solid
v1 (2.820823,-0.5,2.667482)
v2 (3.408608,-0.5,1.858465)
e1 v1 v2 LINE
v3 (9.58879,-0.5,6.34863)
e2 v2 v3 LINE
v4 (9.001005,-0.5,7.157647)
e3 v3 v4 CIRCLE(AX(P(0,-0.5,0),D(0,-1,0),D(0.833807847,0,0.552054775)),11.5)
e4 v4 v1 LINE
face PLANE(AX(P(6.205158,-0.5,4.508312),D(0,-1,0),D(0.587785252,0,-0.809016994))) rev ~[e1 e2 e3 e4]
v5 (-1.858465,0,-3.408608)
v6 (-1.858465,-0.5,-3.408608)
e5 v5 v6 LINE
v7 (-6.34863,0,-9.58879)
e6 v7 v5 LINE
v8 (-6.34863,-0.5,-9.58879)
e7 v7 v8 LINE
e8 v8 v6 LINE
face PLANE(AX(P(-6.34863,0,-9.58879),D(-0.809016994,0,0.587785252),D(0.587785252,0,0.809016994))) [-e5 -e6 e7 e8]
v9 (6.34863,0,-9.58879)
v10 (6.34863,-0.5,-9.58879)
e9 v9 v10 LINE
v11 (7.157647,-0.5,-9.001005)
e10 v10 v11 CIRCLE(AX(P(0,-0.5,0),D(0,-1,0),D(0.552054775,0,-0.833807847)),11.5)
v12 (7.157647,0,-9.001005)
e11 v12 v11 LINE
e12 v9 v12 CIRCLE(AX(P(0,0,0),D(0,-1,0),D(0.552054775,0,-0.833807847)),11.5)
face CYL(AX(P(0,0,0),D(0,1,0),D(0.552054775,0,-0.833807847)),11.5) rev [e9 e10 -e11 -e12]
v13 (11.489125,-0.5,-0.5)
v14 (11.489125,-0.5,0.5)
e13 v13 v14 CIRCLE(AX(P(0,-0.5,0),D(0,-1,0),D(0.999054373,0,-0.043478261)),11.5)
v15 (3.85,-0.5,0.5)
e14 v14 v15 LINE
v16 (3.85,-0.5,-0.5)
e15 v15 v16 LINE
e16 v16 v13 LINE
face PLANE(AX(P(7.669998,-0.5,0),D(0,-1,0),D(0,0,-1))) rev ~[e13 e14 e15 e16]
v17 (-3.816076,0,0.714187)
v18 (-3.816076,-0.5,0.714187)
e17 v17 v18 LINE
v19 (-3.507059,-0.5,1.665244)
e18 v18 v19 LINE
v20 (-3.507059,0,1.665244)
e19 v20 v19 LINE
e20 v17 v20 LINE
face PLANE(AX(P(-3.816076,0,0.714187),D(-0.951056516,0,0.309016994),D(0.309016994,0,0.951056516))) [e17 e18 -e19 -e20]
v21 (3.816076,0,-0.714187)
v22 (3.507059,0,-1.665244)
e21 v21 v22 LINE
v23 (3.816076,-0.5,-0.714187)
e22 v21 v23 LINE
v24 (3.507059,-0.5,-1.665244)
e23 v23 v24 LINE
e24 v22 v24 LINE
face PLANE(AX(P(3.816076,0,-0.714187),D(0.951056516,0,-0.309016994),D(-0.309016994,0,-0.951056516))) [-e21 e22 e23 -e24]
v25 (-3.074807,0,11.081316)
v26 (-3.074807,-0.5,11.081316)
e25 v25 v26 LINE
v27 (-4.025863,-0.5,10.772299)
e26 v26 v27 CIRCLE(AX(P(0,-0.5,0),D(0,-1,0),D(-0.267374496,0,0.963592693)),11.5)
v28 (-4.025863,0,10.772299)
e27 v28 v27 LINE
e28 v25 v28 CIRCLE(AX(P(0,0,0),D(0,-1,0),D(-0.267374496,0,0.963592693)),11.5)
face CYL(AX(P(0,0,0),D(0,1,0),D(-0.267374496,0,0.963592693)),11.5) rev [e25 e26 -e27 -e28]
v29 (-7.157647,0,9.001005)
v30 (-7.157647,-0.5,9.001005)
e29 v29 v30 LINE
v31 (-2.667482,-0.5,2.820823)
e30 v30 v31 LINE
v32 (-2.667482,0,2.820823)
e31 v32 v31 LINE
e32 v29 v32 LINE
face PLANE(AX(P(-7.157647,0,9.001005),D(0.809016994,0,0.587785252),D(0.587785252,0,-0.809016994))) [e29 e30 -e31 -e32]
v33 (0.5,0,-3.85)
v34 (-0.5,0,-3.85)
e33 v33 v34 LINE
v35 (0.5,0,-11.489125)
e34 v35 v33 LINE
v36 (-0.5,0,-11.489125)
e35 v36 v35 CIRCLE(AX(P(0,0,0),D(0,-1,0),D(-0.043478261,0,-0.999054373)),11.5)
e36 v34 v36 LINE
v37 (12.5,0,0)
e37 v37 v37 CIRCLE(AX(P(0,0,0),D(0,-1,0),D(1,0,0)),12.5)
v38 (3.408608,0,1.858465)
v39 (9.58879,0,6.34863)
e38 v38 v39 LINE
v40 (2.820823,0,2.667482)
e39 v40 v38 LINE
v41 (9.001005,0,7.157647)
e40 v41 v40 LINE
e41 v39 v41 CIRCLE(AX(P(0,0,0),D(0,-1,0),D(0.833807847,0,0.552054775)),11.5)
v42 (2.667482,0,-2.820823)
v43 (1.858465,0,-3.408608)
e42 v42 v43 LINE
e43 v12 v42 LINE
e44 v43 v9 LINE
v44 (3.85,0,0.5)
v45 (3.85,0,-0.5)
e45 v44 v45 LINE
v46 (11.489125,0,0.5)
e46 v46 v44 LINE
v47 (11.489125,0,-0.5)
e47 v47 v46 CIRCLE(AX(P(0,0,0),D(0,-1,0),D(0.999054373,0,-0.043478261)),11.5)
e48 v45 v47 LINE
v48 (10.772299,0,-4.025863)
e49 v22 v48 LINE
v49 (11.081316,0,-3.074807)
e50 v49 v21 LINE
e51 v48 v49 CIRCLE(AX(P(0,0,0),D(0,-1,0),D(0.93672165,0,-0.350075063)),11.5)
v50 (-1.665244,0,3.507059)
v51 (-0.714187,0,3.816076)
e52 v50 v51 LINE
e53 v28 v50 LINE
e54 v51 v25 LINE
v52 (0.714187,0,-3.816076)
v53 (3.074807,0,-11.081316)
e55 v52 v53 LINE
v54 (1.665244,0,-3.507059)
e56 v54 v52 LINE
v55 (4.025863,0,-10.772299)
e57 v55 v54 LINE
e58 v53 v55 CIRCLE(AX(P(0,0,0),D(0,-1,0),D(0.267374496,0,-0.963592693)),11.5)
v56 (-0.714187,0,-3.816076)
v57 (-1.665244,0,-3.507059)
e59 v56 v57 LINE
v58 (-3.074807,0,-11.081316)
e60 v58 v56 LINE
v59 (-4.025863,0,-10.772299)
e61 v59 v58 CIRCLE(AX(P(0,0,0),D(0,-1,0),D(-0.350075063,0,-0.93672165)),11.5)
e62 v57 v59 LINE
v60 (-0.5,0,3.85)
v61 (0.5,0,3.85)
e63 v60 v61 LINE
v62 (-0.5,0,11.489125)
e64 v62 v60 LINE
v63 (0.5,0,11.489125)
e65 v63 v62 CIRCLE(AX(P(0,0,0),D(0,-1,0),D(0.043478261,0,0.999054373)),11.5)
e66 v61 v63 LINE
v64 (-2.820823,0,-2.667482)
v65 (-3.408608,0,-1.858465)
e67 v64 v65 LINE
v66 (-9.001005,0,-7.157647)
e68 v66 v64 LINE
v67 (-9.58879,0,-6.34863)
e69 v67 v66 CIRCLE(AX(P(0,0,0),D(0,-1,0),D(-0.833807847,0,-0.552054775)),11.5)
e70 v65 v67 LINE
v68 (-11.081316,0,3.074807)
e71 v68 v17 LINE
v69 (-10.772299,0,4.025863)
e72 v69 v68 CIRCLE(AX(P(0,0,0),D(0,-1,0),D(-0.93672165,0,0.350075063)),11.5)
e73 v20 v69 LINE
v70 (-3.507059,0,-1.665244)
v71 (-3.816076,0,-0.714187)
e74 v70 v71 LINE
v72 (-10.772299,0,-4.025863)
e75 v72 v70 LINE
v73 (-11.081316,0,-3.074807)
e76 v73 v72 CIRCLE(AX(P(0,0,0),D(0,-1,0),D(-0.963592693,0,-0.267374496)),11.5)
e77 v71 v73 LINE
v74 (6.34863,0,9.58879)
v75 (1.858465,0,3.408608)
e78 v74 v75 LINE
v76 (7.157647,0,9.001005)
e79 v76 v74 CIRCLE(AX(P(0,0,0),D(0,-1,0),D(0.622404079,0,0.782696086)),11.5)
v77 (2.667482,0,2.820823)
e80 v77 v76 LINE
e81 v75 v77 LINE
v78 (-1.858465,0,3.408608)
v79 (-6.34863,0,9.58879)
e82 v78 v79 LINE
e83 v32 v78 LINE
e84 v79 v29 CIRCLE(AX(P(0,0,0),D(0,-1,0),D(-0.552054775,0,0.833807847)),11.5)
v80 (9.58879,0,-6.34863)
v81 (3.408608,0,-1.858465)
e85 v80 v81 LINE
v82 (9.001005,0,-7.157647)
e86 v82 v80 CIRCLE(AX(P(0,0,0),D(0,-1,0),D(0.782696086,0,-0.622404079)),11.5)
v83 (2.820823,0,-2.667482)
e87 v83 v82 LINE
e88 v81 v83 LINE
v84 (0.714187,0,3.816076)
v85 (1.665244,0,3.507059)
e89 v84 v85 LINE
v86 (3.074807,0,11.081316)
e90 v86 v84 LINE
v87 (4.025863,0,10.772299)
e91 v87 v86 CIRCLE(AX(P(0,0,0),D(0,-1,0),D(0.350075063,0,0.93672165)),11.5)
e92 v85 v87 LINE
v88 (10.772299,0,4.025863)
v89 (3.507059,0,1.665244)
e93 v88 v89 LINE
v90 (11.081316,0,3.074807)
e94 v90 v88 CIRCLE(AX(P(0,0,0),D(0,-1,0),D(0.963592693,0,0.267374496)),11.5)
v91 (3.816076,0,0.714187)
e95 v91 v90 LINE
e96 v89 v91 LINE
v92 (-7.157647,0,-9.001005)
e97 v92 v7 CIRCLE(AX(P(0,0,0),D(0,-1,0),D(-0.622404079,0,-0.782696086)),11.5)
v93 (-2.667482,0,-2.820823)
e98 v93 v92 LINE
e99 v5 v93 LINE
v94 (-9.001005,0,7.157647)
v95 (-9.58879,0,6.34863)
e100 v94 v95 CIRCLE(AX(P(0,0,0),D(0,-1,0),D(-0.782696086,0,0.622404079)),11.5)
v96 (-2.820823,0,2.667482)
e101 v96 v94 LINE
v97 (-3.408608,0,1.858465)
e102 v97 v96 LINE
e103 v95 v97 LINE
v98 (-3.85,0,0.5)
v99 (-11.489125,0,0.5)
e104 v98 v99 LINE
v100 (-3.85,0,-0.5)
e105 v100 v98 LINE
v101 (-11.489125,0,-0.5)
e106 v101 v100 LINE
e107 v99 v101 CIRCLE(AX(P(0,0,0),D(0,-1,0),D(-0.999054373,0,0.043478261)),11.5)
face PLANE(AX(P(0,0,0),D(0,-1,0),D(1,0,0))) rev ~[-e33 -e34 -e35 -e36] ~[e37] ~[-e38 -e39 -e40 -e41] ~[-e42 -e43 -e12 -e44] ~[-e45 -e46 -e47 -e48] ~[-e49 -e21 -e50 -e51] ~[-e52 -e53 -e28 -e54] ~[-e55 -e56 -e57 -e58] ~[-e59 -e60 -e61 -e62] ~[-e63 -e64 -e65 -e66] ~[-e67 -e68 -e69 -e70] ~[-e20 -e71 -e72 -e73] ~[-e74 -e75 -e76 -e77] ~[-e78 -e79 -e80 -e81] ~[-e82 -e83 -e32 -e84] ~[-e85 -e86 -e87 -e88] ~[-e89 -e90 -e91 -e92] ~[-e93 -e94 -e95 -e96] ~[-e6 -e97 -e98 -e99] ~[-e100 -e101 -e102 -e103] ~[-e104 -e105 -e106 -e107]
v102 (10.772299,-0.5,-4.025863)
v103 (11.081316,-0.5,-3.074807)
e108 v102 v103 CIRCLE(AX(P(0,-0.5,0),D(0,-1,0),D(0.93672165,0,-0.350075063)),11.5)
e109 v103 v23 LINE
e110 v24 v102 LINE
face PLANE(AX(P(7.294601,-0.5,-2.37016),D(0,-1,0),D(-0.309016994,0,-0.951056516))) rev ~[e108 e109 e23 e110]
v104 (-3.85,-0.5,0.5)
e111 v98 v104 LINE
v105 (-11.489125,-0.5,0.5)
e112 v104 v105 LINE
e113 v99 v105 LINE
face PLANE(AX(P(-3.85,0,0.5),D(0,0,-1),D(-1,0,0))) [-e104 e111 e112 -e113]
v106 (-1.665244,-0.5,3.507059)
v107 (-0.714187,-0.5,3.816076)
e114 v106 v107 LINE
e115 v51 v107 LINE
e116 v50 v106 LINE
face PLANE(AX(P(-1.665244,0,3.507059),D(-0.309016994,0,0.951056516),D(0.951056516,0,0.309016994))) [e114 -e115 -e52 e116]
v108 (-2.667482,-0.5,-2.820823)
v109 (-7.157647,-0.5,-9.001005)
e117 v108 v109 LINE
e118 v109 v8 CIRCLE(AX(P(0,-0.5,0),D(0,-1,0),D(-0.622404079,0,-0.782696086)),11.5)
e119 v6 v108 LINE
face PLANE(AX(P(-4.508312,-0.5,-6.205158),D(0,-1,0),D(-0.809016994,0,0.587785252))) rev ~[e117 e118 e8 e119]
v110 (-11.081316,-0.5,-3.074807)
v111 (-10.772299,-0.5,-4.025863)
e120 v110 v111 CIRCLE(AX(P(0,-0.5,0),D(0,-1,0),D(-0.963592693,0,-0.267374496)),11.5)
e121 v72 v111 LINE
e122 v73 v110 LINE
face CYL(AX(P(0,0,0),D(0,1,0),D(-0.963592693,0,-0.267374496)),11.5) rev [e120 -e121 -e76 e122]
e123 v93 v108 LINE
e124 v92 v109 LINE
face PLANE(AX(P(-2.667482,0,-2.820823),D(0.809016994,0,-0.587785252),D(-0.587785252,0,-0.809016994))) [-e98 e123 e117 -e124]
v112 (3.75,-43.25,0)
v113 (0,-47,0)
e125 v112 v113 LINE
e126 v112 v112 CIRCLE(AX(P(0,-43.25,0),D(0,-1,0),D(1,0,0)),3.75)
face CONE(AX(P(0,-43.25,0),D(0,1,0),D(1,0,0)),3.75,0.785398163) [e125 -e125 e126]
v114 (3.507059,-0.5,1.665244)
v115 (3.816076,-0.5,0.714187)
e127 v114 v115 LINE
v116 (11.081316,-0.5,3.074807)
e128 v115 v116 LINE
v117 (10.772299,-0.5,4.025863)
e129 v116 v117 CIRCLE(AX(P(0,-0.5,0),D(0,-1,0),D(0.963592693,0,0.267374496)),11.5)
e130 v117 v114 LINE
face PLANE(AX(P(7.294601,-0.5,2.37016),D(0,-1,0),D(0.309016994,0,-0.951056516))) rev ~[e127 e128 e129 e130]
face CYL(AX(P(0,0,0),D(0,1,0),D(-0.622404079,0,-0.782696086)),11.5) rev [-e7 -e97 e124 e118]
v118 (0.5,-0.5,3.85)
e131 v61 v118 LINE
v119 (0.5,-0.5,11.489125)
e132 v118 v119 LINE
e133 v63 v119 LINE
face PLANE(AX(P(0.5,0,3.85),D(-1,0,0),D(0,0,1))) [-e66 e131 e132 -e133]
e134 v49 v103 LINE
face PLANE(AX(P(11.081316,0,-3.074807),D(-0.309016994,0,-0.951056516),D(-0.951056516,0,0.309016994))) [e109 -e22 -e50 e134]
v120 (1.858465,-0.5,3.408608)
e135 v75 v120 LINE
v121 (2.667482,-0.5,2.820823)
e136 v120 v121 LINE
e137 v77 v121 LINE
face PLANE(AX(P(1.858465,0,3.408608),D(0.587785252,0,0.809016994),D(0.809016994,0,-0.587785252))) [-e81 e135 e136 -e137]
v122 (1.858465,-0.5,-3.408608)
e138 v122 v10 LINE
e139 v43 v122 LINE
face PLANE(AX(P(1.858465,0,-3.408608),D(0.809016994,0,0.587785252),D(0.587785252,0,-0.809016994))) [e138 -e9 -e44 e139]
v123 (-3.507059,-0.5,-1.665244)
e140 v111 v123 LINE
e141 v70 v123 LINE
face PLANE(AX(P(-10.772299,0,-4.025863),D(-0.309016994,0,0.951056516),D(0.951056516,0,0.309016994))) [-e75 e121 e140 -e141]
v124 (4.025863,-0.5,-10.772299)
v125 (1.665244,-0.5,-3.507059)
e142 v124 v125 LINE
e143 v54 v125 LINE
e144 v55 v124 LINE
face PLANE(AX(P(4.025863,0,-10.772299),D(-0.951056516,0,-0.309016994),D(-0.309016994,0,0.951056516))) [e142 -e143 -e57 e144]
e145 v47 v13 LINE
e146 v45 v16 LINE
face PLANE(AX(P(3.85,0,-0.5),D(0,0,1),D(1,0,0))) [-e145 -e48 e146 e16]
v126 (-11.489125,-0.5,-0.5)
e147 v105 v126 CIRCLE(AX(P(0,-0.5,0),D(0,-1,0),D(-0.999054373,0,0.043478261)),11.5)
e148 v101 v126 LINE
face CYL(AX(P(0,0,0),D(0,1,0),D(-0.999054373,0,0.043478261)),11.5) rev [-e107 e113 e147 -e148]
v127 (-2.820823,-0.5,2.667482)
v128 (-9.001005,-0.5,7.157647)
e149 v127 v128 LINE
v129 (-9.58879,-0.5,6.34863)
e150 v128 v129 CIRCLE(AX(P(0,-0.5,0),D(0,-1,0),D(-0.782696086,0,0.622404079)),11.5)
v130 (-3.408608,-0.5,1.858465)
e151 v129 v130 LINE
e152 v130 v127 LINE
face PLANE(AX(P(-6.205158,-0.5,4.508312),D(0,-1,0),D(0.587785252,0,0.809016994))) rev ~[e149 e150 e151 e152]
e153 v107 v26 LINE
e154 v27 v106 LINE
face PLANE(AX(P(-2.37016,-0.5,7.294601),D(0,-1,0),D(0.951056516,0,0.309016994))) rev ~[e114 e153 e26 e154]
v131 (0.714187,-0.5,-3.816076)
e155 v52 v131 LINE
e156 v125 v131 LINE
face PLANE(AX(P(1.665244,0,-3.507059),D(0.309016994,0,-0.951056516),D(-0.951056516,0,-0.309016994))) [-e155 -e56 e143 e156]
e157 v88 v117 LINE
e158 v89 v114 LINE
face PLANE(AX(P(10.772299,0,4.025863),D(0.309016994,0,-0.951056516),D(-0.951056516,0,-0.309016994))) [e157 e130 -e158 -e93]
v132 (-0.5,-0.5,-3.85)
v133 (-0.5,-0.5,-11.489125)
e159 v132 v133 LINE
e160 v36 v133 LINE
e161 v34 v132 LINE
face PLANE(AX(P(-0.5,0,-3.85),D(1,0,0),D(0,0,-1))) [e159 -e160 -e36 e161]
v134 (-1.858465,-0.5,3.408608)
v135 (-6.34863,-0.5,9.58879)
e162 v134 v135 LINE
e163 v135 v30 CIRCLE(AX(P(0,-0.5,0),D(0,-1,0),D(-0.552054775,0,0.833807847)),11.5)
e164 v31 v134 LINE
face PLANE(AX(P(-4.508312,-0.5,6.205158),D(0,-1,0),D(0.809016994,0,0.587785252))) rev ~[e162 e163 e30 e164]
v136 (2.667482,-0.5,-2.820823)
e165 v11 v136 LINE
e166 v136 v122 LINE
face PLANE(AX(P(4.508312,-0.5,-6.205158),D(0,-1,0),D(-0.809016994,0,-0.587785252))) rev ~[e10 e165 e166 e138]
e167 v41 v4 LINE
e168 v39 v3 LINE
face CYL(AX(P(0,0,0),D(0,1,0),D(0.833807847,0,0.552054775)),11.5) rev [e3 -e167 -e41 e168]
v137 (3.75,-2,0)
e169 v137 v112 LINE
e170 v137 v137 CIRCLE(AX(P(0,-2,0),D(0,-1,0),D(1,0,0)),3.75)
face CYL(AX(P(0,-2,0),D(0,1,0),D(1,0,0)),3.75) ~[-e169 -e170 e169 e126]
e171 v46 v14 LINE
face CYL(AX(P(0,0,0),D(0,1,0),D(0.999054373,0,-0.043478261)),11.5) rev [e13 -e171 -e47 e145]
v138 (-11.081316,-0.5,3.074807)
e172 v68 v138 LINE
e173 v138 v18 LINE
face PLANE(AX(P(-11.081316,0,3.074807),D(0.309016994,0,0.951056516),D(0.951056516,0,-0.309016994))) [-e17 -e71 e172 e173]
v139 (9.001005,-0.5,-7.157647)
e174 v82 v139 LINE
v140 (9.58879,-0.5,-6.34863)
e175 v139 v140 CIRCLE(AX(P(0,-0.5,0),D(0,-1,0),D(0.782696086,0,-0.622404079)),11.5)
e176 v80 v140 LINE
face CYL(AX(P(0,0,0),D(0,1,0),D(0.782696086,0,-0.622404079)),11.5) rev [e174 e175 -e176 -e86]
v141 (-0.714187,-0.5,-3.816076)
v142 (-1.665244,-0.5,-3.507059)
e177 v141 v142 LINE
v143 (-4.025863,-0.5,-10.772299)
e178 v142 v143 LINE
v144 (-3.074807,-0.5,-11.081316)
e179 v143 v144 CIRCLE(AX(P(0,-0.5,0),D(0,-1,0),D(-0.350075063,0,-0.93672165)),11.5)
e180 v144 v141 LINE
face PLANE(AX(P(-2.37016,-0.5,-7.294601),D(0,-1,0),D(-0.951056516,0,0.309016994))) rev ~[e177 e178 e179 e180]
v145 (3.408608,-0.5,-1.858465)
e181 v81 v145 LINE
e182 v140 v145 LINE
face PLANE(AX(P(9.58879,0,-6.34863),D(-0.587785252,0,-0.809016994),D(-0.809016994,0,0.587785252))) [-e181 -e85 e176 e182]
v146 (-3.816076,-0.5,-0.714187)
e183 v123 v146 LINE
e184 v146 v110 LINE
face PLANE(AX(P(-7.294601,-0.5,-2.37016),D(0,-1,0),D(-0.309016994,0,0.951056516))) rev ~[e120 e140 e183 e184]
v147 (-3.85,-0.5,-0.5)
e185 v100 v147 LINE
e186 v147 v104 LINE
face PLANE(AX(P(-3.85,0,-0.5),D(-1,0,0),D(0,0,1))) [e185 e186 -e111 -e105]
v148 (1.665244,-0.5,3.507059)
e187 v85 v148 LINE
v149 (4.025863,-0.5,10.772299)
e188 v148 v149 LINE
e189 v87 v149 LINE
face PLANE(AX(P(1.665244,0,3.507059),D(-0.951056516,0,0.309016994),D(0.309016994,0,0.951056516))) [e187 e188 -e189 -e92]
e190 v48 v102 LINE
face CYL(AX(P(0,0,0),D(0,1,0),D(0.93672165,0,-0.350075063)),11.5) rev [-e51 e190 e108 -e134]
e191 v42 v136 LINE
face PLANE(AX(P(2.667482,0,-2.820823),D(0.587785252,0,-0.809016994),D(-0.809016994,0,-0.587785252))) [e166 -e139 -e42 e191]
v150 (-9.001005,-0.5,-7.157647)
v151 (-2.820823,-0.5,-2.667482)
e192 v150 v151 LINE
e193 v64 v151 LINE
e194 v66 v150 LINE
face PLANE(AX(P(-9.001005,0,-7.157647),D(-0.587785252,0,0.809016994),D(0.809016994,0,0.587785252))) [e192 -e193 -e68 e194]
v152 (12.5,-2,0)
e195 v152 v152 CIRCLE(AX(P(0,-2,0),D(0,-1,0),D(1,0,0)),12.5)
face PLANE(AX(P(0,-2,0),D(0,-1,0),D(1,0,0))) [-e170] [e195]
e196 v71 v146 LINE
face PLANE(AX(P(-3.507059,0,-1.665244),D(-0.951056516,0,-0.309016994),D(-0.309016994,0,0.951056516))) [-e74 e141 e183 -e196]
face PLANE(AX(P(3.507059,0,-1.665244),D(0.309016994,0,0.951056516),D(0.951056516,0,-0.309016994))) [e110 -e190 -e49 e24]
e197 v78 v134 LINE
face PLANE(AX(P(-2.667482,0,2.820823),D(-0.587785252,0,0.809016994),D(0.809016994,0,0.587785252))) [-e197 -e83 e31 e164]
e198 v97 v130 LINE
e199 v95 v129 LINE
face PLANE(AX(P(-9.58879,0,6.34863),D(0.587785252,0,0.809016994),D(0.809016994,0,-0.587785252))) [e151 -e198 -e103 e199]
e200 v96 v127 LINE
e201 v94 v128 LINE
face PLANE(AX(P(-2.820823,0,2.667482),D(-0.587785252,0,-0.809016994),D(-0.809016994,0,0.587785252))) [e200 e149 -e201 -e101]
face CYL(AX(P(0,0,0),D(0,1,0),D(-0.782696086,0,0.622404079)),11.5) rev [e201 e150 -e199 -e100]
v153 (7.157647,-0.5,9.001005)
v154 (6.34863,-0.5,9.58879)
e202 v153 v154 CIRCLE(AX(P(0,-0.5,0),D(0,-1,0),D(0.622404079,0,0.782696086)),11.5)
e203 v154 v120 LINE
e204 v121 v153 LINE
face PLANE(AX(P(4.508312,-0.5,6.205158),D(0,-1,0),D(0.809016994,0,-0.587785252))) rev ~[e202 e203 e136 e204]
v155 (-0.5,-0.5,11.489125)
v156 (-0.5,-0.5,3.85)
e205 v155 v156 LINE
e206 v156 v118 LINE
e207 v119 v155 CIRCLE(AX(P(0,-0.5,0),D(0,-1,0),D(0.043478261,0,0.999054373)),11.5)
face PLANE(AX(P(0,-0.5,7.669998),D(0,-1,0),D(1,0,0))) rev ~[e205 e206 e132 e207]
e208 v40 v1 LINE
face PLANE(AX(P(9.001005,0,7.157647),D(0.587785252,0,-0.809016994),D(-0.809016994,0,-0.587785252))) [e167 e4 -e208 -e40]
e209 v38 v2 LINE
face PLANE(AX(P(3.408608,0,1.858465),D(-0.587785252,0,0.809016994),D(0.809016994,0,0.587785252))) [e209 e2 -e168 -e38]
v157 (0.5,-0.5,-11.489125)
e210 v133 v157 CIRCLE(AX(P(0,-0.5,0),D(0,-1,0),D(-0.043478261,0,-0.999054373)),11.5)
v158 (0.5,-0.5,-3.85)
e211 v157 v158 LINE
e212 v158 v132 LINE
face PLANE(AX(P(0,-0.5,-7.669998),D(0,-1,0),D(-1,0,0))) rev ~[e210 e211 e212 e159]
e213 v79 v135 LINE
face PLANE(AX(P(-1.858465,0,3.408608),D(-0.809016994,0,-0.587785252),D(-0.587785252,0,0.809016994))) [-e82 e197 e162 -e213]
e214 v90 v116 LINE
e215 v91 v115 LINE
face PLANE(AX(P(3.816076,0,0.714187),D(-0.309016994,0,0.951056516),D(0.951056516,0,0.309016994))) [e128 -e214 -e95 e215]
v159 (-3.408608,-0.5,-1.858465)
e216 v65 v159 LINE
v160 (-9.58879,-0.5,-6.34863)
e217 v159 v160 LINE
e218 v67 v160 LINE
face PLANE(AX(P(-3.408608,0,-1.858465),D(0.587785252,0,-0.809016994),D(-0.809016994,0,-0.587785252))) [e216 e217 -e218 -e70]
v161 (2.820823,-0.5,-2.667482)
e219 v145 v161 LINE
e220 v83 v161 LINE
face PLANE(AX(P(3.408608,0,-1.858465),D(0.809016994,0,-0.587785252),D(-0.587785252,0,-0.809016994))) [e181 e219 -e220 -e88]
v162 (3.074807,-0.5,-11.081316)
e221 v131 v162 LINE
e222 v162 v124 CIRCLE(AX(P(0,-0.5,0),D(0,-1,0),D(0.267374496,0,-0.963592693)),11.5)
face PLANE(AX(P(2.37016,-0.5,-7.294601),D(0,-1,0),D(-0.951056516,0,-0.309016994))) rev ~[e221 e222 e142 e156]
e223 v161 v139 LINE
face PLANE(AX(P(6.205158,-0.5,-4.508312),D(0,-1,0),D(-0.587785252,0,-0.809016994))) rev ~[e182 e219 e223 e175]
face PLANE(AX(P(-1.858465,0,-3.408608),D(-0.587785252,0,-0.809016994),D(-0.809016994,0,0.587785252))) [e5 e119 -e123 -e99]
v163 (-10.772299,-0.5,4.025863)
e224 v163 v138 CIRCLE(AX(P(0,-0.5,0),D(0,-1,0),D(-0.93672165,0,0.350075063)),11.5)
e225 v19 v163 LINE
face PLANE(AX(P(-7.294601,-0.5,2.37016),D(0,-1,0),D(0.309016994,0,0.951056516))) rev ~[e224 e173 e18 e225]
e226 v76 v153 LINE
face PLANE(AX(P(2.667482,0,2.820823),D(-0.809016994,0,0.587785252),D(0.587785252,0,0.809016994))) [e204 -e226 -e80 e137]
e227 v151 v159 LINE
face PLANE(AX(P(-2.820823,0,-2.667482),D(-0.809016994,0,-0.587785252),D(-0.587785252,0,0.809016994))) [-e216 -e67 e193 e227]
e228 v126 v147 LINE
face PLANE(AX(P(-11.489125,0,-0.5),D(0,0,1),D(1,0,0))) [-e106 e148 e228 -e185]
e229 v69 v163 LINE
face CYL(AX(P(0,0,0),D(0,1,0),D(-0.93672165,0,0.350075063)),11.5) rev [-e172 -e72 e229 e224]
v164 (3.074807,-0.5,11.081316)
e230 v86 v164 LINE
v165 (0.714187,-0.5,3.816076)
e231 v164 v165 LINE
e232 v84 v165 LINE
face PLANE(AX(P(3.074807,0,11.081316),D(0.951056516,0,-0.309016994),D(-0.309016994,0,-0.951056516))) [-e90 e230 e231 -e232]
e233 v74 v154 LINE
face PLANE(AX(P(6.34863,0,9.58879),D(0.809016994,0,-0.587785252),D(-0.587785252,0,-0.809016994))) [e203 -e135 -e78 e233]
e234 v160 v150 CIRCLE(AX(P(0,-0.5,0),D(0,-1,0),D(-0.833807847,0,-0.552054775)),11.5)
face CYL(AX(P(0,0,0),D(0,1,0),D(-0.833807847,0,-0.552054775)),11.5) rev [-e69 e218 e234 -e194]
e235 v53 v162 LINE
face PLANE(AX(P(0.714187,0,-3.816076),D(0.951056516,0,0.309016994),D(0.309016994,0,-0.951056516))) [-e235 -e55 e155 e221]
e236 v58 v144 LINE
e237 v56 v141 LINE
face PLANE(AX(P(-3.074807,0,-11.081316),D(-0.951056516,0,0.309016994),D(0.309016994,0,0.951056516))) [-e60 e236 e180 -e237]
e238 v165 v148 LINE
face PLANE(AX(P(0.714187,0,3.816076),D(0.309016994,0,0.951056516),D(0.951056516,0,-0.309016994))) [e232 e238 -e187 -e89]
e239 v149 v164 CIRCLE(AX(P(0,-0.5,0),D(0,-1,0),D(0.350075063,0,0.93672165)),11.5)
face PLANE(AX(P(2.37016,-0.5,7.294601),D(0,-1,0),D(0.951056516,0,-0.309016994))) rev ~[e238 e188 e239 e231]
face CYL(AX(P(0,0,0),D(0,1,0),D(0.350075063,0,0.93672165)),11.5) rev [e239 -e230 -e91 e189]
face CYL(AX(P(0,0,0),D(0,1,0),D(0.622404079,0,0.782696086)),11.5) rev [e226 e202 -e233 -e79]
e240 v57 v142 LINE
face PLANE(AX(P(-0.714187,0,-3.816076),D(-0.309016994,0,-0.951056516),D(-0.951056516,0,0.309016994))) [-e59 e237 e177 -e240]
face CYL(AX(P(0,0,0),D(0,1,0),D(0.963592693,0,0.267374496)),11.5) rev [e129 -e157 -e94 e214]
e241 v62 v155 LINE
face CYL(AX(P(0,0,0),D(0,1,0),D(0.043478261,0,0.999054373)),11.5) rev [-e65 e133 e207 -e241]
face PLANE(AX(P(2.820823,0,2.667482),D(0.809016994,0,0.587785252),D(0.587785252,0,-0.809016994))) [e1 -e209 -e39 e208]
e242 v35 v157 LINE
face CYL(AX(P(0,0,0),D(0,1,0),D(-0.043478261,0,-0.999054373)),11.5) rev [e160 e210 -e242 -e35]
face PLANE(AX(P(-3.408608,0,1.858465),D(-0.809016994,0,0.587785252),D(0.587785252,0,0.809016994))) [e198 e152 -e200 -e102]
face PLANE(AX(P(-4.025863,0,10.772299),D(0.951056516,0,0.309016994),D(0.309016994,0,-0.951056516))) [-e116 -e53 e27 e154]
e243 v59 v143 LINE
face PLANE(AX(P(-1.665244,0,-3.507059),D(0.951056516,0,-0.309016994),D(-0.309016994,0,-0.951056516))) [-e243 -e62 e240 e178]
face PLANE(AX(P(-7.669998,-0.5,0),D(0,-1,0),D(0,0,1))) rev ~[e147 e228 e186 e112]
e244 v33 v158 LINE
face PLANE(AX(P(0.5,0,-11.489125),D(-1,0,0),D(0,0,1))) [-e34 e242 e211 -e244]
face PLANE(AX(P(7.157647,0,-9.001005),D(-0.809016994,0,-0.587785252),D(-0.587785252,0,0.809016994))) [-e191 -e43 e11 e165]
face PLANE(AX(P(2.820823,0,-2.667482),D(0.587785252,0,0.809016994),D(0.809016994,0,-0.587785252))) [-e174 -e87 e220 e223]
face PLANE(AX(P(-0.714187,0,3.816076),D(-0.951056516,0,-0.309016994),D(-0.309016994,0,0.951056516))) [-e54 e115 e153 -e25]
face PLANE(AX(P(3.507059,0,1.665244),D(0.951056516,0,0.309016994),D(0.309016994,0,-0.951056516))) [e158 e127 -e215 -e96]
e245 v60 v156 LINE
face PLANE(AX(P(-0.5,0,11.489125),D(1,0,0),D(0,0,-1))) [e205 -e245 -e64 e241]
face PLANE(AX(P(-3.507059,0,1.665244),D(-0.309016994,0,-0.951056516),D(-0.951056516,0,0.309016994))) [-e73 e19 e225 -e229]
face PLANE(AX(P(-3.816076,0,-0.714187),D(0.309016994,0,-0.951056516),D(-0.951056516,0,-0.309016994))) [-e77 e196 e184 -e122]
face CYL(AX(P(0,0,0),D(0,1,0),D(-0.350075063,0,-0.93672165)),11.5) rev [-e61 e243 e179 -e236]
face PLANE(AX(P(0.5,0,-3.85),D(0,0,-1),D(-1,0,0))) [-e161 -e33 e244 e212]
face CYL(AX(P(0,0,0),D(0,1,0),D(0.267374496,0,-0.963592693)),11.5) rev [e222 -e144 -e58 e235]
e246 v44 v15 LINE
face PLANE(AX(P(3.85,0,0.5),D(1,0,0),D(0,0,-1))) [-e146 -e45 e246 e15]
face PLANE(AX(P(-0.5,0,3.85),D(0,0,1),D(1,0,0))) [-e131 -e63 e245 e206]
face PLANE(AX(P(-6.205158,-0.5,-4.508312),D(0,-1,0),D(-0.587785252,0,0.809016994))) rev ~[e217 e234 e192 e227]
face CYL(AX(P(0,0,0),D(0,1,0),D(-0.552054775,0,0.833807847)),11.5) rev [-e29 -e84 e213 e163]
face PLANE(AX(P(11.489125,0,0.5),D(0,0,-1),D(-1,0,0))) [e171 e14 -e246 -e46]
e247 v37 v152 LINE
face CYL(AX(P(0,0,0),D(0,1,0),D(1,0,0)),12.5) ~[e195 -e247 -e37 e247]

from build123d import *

# Parameters (mm, degrees)
F0_R            = 12.5
F1_DEPTH        = 2
F2_R            = 3.75
F3_DEPTH        = 45
F4_SIZE         = 3.75
F7_DEPTH        = 0.5
F7_COPIES_COUNT = 20


# Not quite as in the source:
# - a pattern or mirror of a feature is missing from the dataset's text; its kind, count and spacing are read off the source's solid


with BuildPart() as f1:
    # F0 (on Front) → F1 (new body)
    with BuildSketch(Plane.XZ):
        Circle(F0_R)
    extrude(amount=F1_DEPTH)

    # F2 (on face) → F3 (join)
    with BuildSketch(Plane.XZ.offset(2)):
        Circle(F2_R)
    extrude(amount=F3_DEPTH)

    # F4
    f4_edges = [f1.edges().sort_by_distance(p)[0] for p in [
        (-3.75, -47, 0),
    ]]
    chamfer(f4_edges, length=F4_SIZE)

    # F6 (on Front) → F7 (cut)
    with BuildSketch(Plane.XZ):
        with BuildLine():
            Line((-0.5, 3.85), (0.5, 3.85))
            Line((0.5, 3.85), (0.5, 11.4891252931))
            ThreePointArc((0.5, 11.4891252931), (0, 11.5), (-0.5, 11.4891252931))
            Line((-0.5, 11.4891252931), (-0.5, 3.85))
        make_face()
    f7 = extrude(amount=F7_DEPTH, mode=Mode.SUBTRACT)

    # F7_copies: F7 ×20 about axis
    f7_copies_axis = Axis((0, 0, 0), (0, 1, 0))
    for i in range(1, F7_COPIES_COUNT):
        add(f7.rotate(f7_copies_axis, i * 360 / F7_COPIES_COUNT), mode=Mode.SUBTRACT)


solid = f1.part
